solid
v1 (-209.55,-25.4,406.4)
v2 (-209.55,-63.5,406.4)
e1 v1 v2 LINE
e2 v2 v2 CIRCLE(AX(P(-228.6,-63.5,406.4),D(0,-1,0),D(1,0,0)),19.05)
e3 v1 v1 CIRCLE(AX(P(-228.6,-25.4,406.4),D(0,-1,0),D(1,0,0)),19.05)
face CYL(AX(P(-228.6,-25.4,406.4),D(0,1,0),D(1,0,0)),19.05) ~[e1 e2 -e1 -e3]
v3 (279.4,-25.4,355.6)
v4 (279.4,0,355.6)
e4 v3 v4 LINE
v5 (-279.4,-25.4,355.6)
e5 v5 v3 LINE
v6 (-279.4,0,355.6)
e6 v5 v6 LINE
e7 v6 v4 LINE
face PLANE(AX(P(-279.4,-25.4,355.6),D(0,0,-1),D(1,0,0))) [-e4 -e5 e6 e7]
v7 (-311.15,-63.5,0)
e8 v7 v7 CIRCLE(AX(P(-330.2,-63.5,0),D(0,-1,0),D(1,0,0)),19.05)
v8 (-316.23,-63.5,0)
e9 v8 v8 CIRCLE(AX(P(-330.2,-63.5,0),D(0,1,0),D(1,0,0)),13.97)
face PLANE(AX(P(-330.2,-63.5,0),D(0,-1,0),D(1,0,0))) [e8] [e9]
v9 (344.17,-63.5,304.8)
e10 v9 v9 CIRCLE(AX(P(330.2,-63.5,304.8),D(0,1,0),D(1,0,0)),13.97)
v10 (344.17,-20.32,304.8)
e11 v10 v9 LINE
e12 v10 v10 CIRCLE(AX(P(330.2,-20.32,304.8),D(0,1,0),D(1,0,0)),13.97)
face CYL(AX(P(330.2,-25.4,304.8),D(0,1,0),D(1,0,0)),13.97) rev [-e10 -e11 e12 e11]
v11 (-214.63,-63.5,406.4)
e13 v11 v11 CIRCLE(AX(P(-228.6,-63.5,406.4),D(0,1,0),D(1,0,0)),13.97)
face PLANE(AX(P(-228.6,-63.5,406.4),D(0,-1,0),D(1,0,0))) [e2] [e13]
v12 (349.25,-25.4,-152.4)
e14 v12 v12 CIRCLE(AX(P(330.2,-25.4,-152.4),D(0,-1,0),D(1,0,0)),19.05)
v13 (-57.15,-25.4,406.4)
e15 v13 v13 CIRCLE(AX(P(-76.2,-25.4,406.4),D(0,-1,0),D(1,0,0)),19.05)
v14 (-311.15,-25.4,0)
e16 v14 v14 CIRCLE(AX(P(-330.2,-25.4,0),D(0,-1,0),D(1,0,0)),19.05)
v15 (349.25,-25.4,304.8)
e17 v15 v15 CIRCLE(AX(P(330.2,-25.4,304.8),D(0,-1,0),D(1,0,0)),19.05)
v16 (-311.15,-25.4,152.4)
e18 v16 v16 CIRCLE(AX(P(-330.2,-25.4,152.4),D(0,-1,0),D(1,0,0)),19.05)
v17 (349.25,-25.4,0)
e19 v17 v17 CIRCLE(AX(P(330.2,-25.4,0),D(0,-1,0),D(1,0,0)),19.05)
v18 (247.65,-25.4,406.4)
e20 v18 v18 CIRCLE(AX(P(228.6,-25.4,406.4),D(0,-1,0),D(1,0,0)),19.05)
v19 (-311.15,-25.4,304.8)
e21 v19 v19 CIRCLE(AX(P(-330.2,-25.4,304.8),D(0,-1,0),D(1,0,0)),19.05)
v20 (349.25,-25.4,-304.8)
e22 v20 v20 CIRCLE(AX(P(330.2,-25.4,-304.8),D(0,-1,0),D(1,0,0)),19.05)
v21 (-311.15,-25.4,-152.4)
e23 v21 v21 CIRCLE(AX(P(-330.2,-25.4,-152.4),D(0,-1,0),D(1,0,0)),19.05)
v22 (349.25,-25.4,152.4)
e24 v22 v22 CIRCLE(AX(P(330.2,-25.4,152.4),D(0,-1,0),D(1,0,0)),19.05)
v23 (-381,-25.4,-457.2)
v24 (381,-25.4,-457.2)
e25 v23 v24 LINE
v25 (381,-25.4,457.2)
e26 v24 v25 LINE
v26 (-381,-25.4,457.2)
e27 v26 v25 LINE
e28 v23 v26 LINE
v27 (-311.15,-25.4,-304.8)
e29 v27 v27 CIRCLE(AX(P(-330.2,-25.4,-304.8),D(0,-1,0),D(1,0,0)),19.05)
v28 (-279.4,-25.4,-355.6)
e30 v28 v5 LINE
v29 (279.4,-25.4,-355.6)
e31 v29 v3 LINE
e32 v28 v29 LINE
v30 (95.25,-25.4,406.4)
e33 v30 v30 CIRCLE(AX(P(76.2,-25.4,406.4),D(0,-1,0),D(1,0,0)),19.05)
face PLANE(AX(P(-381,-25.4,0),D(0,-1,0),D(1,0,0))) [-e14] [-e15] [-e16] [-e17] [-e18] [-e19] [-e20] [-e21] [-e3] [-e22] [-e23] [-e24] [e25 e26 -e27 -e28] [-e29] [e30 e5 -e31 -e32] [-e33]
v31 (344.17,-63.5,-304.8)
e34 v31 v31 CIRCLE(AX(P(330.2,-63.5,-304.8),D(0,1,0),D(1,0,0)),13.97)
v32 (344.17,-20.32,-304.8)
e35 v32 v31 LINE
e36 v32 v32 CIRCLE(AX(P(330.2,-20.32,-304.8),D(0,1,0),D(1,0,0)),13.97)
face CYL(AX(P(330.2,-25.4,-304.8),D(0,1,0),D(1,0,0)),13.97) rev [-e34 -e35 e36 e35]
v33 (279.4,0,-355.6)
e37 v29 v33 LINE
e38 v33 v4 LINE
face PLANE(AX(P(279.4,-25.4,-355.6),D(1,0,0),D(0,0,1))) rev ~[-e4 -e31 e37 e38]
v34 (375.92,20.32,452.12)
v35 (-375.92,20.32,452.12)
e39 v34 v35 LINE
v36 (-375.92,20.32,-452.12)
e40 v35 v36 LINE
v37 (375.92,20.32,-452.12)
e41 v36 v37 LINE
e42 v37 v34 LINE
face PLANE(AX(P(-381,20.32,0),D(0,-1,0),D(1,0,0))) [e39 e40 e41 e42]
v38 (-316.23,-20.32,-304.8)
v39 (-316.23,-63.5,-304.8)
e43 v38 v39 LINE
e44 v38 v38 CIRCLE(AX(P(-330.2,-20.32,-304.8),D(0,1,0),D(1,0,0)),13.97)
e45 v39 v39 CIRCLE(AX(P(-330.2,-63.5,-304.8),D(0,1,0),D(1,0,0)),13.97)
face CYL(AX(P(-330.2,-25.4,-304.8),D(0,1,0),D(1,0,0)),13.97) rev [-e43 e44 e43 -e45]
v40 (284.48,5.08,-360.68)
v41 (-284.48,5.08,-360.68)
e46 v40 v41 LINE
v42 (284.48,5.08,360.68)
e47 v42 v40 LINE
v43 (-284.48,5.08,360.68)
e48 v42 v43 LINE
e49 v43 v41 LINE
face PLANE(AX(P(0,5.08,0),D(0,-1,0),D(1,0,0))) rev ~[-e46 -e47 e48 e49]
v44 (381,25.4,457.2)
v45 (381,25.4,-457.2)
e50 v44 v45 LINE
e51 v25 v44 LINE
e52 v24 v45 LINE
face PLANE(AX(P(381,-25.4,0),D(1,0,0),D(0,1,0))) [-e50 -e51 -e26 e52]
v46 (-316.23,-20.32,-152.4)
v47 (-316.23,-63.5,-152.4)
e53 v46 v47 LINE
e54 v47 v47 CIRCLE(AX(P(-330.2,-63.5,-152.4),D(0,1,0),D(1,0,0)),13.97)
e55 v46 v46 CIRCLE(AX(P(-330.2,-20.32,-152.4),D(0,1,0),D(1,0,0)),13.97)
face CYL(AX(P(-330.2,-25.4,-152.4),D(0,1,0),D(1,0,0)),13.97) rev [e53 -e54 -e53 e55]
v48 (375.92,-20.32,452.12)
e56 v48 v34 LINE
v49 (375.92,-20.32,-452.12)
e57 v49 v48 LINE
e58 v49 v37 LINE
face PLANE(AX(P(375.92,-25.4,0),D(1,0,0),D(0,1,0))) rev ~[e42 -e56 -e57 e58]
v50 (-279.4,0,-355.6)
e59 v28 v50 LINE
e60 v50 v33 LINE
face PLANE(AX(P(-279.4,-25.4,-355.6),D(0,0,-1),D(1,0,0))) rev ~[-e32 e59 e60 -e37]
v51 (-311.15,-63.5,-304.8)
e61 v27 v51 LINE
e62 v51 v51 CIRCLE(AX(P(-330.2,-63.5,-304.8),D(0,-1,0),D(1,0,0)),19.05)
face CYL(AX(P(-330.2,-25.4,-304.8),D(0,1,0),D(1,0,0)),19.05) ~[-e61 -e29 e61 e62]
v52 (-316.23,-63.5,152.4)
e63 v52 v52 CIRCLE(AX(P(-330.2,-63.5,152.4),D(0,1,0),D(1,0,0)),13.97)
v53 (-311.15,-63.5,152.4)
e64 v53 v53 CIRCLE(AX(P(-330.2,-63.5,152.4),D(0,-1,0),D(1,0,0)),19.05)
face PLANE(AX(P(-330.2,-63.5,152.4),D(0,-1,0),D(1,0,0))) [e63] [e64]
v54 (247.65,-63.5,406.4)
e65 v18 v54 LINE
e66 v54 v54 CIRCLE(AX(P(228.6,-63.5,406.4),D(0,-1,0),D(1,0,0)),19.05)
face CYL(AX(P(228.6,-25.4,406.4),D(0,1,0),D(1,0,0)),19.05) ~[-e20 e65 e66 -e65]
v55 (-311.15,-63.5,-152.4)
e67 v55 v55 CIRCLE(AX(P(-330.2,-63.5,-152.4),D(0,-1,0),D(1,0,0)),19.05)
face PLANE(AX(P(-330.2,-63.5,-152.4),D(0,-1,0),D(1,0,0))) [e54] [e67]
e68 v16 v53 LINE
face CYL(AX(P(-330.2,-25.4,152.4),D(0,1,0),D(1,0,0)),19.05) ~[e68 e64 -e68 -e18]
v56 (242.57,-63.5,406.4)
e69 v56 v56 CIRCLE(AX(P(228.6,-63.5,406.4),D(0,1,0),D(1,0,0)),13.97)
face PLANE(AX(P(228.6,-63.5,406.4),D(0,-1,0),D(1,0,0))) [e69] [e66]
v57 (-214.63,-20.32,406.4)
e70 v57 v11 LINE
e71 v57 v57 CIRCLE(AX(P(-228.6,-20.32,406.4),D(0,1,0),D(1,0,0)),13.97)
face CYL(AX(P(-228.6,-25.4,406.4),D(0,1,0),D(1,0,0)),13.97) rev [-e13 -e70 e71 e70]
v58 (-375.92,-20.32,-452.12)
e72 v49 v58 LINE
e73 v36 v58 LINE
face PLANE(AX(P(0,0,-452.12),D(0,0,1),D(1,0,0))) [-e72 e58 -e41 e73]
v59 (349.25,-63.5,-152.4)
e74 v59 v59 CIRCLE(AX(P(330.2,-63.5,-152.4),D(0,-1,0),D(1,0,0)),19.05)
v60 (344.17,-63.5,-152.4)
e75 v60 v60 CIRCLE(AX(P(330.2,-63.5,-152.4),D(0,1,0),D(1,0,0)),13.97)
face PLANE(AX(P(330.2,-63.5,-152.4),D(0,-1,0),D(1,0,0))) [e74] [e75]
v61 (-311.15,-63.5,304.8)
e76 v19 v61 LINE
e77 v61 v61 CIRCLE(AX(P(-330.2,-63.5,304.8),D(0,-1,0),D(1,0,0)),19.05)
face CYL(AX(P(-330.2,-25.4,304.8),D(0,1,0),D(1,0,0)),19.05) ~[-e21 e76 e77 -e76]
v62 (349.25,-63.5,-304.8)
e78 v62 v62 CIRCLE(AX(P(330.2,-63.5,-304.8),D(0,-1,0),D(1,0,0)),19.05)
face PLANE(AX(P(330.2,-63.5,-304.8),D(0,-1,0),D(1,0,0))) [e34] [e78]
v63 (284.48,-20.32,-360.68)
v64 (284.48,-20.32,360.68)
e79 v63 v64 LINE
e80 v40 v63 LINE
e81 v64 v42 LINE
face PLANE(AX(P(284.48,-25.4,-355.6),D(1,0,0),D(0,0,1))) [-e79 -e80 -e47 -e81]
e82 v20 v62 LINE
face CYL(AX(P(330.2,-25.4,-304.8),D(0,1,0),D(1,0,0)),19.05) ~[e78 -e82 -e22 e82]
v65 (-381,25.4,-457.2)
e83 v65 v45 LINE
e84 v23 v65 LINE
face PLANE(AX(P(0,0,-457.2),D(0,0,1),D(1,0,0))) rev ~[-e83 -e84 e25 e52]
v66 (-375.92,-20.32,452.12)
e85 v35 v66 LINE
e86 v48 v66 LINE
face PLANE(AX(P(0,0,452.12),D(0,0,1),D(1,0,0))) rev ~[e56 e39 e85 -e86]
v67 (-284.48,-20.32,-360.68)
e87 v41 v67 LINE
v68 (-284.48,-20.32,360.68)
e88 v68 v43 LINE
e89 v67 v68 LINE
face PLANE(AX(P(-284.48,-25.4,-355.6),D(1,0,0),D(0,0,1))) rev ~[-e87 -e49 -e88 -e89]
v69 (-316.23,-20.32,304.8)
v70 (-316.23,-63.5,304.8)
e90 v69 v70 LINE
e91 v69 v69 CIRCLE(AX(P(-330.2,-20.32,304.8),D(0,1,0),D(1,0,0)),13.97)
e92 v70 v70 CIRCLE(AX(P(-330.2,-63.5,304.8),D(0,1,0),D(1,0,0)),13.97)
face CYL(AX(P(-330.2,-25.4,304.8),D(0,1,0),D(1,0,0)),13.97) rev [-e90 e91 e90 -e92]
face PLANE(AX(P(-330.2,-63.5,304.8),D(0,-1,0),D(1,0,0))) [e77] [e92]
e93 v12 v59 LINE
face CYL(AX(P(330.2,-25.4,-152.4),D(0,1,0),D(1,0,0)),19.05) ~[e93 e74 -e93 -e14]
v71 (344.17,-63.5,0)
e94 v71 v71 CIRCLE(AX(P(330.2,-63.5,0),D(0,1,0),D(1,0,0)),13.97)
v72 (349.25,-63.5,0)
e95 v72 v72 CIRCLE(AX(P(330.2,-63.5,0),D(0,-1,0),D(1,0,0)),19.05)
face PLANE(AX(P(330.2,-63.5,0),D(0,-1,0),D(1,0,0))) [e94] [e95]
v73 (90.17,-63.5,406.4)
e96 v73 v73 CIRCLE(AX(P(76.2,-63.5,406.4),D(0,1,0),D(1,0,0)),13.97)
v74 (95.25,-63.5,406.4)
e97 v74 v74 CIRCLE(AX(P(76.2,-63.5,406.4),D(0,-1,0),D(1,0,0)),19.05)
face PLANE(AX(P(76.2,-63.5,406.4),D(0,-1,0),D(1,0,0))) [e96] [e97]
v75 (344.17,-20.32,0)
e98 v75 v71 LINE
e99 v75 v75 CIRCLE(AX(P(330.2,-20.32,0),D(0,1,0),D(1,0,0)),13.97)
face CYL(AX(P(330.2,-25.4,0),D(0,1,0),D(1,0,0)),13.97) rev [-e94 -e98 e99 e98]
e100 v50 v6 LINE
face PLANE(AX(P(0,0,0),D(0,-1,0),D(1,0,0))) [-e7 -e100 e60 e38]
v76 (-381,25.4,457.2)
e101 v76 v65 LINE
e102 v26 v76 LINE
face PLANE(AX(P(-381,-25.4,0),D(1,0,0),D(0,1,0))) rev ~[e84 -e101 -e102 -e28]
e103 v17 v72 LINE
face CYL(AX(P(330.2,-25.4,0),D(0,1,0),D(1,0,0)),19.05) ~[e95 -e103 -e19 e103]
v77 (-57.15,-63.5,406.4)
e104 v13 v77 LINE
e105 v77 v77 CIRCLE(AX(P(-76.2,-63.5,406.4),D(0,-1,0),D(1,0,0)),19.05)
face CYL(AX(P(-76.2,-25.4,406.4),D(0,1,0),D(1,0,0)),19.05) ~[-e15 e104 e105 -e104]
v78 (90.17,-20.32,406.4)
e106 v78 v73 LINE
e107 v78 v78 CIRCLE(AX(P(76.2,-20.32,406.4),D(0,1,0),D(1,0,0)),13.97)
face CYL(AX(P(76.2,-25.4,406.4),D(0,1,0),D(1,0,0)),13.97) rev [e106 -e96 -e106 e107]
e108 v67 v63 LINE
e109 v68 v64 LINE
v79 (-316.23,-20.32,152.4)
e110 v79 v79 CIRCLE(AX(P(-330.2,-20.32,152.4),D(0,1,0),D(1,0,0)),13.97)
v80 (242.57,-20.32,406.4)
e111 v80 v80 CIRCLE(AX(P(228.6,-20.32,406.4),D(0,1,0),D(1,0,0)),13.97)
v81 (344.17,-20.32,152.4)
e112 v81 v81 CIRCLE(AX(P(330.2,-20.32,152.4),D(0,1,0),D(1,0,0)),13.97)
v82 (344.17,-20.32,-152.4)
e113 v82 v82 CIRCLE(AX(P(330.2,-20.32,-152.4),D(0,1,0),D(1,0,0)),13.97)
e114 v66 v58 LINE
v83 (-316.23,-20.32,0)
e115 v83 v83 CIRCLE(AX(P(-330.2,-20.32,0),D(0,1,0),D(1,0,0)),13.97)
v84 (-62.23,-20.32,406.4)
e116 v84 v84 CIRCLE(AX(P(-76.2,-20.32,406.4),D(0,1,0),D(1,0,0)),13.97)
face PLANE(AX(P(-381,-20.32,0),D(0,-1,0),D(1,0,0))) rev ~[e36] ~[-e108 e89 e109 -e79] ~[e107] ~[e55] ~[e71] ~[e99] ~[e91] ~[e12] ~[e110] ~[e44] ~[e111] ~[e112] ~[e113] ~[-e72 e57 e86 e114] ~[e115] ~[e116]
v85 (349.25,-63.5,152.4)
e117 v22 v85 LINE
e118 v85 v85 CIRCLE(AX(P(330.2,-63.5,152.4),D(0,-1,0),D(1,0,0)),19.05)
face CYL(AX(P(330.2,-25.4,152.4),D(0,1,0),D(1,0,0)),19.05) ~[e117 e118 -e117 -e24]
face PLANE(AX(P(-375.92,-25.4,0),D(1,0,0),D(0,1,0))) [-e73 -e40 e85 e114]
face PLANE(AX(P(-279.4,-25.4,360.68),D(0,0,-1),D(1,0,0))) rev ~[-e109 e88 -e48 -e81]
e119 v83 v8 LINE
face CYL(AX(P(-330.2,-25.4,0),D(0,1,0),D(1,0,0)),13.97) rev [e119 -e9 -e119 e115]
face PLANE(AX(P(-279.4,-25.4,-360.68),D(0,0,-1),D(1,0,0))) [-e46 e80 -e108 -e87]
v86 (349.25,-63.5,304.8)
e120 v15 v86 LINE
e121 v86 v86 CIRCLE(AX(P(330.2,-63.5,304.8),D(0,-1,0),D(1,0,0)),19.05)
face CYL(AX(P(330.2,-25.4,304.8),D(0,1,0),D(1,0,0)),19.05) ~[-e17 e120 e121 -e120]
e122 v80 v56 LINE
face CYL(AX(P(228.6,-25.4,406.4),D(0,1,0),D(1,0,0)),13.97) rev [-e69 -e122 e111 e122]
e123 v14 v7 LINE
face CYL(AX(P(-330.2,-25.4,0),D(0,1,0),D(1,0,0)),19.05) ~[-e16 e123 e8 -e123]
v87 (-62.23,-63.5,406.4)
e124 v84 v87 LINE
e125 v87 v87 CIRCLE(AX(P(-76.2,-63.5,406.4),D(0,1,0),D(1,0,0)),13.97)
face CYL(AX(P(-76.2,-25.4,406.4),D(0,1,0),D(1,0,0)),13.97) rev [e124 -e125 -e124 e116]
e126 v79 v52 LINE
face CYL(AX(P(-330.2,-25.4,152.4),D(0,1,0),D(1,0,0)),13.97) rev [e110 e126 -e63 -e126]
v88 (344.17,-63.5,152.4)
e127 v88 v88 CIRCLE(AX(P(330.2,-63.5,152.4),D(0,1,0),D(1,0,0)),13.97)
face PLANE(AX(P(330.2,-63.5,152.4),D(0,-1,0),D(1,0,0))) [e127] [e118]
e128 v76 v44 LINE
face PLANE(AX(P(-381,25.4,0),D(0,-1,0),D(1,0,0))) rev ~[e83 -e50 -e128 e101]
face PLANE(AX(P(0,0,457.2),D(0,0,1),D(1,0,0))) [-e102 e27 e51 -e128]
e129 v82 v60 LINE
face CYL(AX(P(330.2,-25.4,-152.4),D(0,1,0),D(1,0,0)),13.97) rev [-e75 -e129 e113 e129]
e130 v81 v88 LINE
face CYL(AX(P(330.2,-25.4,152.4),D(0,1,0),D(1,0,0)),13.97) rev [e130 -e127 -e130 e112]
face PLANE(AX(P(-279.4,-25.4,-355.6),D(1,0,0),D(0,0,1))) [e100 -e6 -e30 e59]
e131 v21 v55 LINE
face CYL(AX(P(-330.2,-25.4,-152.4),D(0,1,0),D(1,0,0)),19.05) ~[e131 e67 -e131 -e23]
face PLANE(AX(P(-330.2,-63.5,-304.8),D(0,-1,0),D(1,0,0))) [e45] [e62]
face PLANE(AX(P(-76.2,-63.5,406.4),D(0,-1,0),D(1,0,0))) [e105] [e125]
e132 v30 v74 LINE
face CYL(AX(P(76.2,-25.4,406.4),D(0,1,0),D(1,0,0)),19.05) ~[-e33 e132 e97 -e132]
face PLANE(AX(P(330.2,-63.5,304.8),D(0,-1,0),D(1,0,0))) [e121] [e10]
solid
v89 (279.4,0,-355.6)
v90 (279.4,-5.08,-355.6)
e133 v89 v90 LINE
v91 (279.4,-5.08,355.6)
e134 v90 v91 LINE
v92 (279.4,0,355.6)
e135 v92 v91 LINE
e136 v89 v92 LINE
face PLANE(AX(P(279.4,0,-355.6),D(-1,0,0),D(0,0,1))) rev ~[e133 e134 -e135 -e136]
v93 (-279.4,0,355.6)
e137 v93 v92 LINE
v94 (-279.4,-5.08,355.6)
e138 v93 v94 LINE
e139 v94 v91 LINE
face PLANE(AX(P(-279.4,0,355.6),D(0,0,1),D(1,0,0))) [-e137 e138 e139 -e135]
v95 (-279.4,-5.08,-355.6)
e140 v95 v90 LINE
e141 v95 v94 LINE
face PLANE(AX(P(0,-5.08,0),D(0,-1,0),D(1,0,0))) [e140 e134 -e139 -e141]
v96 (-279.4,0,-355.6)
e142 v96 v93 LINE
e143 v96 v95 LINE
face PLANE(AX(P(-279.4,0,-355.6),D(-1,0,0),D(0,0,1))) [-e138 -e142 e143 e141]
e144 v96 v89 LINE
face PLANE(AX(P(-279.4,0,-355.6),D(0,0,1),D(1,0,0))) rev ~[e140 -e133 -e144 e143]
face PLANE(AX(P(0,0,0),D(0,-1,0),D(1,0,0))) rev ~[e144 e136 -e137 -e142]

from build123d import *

# Parameters (mm, degrees)
F0_W     = 762
F0_H     = 50.8
F1_DEPTH = 457.2
F2_W     = 558.8
F2_H     = 711.2
F3_DEPTH = 25.4
F4_R     = 19.05
F5_DEPTH = 38.1
F6_T     = -5.08
F7_DEPTH = 5.08


# Not quite as in the source:
# - a feature names something its author has since deleted; it is built from what else it names


with BuildPart() as f1:
    # F0 (on Top) → F1 (new body, symmetric)
    with BuildSketch(Plane.XY):
        Rectangle(F0_W, F0_H)
    extrude(amount=F1_DEPTH, both=True)

    # F2 (on face) → F3 (cut)
    with BuildSketch(Plane.XZ.offset(25.4)):
        Rectangle(F2_W, F2_H)
    extrude(amount=-F3_DEPTH, mode=Mode.SUBTRACT)

    # F4 (on face) → F5 (join)
    with BuildSketch(Plane.XZ.offset(25.4)):
        with Locations((-228.6, 406.4)):
            Circle(F4_R)
        with Locations((-330.2, 304.8)):
            Circle(F4_R)
        with Locations((-330.2, 152.4)):
            Circle(F4_R)
        with Locations((-330.2, 0)):
            Circle(F4_R)
        with Locations((-330.2, -152.4)):
            Circle(F4_R)
        with Locations((-330.2, -304.8)):
            Circle(F4_R)
        with Locations((330.2, -304.8)):
            Circle(F4_R)
        with Locations((330.2, -152.4)):
            Circle(F4_R)
        with Locations((330.2, 0)):
            Circle(F4_R)
        with Locations((330.2, 152.4)):
            Circle(F4_R)
        with Locations((330.2, 304.8)):
            Circle(F4_R)
        with Locations((-76.2, 406.4)):
            Circle(F4_R)
        with Locations((76.2, 406.4)):
            Circle(F4_R)
        with Locations((228.6, 406.4)):
            Circle(F4_R)
    extrude(amount=F5_DEPTH)

    # F6
    f6_openings = [f1.faces().sort_by_distance(p)[0] for p in [
        (-330.2, -63.5, 304.8),
        (-330.2, -63.5, 152.4),
        (-228.6, -63.5, 406.4),
        (-76.2, -63.5, 406.4),
        (76.2, -63.5, 406.4),
        (228.6, -63.5, 406.4),
        (330.2, -63.5, 304.8),
        (330.2, -63.5, 152.4),
        (330.2, -63.5, 0),
        (330.2, -63.5, -304.8),
        (330.2, -63.5, -152.4),
        (-330.2, -63.5, -304.8),
        (-330.2, -63.5, -152.4),
        (-330.2, -63.5, 0),
    ]]
    offset(amount=F6_T, openings=f6_openings, kind=Kind.INTERSECTION)


with BuildPart() as f7:
    # F7 (new): a face of the model
    f7_faces = [f1.part.faces().sort_by_distance(p)[0] for p in [
        (0, 0, 0),
    ]]
    extrude(f7_faces, amount=F7_DEPTH)


solid = Compound([f1.part, f7.part])
